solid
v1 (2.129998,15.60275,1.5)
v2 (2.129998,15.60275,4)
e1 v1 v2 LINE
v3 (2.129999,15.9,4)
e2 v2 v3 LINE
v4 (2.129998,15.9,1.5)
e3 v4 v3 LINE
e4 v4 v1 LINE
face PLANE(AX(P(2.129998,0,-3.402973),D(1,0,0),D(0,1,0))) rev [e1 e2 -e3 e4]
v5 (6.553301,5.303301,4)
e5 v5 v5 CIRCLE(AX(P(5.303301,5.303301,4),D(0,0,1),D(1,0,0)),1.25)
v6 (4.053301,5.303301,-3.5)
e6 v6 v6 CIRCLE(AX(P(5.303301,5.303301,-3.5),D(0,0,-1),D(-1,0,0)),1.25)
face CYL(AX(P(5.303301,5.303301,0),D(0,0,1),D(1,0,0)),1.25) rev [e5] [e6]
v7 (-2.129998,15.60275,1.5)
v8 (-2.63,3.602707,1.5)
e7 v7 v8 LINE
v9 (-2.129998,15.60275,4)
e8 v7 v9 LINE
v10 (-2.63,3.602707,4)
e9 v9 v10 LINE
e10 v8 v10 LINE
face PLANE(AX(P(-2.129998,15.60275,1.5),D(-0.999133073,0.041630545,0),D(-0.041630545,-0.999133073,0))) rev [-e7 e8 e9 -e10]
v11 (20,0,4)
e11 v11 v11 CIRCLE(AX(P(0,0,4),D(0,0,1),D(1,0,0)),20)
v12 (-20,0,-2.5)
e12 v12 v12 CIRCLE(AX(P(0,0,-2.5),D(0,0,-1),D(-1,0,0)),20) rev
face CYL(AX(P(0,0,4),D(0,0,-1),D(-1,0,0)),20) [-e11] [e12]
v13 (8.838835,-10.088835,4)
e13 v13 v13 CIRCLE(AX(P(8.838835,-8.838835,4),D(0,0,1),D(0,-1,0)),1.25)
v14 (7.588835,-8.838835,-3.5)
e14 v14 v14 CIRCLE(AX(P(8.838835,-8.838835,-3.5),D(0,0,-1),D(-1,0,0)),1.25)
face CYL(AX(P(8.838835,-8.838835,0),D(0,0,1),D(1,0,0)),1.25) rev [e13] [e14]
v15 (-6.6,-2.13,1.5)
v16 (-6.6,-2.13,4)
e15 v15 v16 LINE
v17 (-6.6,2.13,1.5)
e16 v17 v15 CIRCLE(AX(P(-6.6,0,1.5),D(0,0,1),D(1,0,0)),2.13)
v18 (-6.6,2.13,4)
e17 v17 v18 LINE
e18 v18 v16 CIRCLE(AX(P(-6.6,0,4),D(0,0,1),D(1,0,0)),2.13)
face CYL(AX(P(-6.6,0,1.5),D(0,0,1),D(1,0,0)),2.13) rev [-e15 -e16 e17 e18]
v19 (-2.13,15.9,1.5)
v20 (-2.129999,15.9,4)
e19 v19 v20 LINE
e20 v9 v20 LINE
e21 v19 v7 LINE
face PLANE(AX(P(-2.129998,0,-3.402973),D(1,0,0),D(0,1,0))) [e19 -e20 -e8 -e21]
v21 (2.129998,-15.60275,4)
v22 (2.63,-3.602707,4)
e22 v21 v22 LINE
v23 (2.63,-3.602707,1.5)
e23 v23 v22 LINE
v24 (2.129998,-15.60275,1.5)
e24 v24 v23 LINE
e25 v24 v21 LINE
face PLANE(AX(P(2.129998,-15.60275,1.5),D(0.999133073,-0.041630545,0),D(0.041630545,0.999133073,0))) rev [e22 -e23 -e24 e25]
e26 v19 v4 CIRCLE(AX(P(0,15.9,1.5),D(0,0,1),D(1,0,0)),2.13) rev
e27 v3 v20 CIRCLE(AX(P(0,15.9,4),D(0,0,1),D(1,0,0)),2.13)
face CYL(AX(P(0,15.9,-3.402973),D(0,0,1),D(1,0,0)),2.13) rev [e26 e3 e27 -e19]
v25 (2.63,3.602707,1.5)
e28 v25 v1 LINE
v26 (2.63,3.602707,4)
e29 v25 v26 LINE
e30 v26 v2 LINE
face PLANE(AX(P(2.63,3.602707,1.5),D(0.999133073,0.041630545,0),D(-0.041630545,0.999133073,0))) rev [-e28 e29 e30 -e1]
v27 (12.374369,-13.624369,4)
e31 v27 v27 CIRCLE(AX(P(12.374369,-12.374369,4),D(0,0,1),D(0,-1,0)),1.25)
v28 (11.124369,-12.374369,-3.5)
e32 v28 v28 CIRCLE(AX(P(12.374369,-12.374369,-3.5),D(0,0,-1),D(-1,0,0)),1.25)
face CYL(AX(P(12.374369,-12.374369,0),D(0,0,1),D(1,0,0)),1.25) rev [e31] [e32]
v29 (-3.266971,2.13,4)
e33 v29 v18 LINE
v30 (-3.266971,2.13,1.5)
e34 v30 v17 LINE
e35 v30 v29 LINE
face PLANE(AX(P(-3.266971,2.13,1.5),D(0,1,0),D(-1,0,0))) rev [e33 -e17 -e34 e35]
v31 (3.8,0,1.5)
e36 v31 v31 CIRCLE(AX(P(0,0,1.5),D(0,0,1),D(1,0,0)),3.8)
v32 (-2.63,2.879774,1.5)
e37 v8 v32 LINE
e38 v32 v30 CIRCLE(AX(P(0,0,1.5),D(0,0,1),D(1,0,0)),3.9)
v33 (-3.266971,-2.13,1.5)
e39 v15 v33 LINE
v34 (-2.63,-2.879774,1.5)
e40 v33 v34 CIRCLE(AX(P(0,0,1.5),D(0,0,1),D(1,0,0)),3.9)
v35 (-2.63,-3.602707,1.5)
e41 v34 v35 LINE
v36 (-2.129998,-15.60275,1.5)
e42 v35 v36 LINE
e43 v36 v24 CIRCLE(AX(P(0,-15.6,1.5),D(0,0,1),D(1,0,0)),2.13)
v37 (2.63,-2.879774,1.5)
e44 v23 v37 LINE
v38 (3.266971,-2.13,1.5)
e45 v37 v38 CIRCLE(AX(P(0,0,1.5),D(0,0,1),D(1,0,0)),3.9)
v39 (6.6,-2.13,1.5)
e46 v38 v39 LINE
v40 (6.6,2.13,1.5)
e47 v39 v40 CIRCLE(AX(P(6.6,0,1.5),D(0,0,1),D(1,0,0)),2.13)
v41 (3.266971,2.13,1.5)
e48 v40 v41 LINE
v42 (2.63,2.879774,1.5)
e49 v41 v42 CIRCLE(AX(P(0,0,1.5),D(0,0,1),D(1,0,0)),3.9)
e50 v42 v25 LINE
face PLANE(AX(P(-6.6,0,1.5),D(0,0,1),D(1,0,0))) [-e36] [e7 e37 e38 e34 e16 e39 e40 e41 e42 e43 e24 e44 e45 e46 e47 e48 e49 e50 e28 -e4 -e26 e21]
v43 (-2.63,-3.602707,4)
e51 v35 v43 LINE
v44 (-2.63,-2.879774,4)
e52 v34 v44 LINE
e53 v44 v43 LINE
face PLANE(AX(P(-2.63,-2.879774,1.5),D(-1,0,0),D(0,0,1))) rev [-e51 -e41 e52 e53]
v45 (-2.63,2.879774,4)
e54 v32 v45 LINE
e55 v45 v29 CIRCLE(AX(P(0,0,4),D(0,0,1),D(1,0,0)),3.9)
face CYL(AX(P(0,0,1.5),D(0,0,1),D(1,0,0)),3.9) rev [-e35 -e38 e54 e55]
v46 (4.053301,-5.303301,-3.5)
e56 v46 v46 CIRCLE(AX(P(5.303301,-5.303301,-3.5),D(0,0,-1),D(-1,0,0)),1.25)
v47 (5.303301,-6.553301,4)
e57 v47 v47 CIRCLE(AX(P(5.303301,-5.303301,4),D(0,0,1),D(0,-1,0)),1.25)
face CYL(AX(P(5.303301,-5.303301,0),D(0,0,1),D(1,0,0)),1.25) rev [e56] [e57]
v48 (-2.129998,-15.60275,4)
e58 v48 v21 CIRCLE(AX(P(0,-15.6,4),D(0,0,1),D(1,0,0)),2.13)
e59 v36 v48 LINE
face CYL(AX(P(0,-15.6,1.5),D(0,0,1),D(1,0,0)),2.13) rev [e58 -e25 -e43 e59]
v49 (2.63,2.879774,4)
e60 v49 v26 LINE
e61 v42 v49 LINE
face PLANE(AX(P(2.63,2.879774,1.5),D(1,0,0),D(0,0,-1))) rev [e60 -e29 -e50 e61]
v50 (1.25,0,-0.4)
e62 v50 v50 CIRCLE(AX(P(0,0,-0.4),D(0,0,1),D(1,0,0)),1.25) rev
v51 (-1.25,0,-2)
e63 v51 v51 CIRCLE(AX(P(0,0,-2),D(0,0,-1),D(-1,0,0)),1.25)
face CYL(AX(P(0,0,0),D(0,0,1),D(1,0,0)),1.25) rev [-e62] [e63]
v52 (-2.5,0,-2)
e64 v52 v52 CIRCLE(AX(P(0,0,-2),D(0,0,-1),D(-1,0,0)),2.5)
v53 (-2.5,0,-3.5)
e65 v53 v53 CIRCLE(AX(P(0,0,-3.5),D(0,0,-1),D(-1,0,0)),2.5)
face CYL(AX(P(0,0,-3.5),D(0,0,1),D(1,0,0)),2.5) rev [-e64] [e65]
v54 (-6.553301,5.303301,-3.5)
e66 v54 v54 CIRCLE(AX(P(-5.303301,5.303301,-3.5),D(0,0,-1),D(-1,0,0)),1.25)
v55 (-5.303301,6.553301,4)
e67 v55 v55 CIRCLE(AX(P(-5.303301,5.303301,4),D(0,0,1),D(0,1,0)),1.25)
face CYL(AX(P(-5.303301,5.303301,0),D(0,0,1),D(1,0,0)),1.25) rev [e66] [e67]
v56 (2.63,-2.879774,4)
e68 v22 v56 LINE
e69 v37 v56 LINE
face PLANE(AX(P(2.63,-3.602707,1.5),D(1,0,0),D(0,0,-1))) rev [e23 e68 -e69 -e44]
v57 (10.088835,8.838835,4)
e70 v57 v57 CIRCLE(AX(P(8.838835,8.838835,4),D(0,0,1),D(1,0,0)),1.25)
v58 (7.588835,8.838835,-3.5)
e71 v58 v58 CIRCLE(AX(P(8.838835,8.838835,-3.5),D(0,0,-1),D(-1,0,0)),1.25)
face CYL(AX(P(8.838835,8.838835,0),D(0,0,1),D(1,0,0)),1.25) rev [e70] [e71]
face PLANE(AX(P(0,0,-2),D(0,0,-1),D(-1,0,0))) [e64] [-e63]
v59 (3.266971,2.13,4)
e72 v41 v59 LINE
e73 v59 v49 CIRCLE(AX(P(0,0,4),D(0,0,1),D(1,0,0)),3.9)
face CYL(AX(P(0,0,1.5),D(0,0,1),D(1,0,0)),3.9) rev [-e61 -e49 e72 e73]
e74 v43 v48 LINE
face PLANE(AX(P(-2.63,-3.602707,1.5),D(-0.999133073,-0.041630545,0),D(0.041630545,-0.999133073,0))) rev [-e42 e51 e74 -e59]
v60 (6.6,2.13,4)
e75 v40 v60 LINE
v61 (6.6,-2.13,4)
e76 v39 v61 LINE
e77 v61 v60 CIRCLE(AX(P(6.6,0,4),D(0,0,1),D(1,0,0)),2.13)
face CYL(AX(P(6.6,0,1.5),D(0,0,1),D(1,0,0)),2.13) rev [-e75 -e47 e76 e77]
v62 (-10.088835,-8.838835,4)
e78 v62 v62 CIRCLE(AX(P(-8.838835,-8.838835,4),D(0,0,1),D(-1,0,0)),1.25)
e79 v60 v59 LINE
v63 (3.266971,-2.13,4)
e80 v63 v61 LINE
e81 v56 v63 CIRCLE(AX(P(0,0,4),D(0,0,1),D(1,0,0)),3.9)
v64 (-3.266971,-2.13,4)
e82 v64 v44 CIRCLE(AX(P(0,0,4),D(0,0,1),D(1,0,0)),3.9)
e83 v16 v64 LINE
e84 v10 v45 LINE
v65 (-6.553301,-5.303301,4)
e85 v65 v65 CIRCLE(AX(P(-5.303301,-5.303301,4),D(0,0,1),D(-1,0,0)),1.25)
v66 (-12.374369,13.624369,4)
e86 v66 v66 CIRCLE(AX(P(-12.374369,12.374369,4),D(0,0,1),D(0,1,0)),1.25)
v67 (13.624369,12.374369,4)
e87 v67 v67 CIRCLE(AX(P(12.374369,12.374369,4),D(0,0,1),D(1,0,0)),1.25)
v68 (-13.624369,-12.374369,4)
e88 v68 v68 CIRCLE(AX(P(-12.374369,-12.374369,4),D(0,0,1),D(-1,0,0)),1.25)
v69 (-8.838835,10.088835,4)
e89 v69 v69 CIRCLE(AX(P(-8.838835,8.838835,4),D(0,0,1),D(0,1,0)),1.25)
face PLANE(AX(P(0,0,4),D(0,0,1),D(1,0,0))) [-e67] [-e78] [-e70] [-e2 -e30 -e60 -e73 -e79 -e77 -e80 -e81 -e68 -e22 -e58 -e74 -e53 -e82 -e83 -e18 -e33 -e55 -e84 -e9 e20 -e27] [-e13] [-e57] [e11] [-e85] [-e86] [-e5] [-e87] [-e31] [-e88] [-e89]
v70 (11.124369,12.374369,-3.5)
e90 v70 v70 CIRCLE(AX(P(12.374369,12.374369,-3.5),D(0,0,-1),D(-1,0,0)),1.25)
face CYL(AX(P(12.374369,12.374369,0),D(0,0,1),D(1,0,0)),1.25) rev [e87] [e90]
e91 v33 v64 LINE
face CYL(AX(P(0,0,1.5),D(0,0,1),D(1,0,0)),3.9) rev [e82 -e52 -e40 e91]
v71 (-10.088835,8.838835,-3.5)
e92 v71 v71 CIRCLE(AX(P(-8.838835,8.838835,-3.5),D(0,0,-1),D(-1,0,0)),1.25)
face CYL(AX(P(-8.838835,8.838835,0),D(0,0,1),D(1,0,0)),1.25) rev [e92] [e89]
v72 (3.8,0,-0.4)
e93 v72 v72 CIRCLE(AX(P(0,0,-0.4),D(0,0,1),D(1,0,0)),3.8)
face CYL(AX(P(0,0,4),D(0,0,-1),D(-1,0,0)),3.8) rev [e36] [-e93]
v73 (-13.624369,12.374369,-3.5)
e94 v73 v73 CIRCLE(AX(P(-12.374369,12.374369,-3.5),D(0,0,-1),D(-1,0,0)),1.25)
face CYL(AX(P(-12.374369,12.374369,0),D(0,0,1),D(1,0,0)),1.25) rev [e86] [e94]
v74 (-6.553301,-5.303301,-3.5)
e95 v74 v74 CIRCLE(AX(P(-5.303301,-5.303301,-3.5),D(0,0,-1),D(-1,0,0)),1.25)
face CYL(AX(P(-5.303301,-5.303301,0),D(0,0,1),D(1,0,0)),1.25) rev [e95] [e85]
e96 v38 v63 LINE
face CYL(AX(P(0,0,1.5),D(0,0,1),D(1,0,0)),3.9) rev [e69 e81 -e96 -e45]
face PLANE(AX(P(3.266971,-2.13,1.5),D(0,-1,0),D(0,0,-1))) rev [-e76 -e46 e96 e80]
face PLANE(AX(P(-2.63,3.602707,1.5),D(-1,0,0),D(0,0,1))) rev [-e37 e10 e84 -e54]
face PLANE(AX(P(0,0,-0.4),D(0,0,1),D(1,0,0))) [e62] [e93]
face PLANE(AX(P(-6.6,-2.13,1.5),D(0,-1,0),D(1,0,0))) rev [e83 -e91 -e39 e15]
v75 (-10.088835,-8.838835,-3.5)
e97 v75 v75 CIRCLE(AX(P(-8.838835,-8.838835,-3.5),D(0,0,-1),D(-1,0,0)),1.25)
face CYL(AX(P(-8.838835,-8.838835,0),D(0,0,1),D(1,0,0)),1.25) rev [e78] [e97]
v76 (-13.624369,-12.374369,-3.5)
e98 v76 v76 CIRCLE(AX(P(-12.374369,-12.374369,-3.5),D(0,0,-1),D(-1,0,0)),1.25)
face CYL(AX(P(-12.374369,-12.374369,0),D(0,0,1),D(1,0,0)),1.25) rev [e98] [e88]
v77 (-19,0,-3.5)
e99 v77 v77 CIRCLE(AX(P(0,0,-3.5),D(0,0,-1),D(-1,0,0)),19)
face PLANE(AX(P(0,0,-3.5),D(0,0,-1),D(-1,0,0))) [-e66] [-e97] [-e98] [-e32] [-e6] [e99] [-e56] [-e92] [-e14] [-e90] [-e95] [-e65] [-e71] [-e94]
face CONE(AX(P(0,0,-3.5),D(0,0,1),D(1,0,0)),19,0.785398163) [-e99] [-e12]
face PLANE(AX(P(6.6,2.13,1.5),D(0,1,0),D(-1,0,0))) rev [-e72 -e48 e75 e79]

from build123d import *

# Parameters (mm, degrees)
SKETCH1_R               = 20
BOSS_EXTRUDE1_DEPTH     = 4
SKETCH2_R               = 1.25
CUT_EXTRUDE1_DEPTH      = 29.565713714
CAVITY1_START           = 2.8
CAVITY1_OUTLINE_R       = 0.675
CAVITY1_OUTLINE_R_2     = 0.6
CAVITY1_OUTLINE_R_3     = 2.5
CAVITY1_DEPTH           = 1.2
CAVITY1_START_2         = 3.4
CAVITY1_2_OUTLINE_R     = 2.5
CAVITY1_2_OUTLINE_R_2   = 1.25
CAVITY1_2_DEPTH         = 0.6
CUT_EXTRUDE2_START      = -2
CUT_EXTRUDE2_DEPTH      = 2
CUT_EXTRUDE3_START      = -1.2
CUT_EXTRUDE3_DEPTH      = 1.2
CUT_EXTRUDE4_DEPTH      = 1.2
SKETCH6_R               = 1.25
CUT_EXTRUDE5_DEPTH      = 29.565713714
CIRPATTERN1_COUNT       = 4
CUT_EXTRUDE6_DEPTH      = 29.422526278
CUT_EXTRUDE6_DEPTH_BACK = 2.4
SKETCH7_R               = 3.8
SKETCH8_R               = 20
SKETCH8_R_2             = 2.5
SKETCH8_R_3             = 1.25
BOSS_EXTRUDE2_DEPTH     = 3.5
CUT_EXTRUDE7_DEPTH      = 2.5
SKETCH10_R              = 2.5
SKETCH10_R_2            = 1.25
BOSS_EXTRUDE4_DEPTH     = 0.8
SKETCH11_R              = 2.5
SKETCH11_R_2            = 1.25
BOSS_EXTRUDE5_DEPTH     = 1.2
SKETCH12_R              = 3.8
CUT_EXTRUDE8_DEPTH      = 0.8
CHAMFER1_SIZE           = 1
CUT_EXTRUDE9_START      = -2.5
CUT_EXTRUDE9_DEPTH      = 2.5


# Read off the part's stored shape, not the designer's step: Cavity1, Cut-Extrude9
with BuildPart() as part:
    # Sketch1 → Boss-Extrude1 (new body)
    with BuildSketch(Plane.XY):
        Circle(SKETCH1_R)
    extrude(amount=BOSS_EXTRUDE1_DEPTH)

    # Sketch2 → Cut-Extrude1 (cut, through all)
    with BuildSketch(Plane.XY.offset(4)):
        Circle(SKETCH2_R)
    extrude(amount=-CUT_EXTRUDE1_DEPTH, mode=Mode.SUBTRACT)

    # Cavity1 outline → Cavity1 (cut)
    with BuildSketch(Plane.XY.offset(CAVITY1_START)):
        with BuildLine():
            ThreePointArc((2.993325909, 2), (2.762479071, 2.308399745), (2.5, 2.590366769))
            Line((2.5, 2.590366769), (2.5, 3.6))
            Line((2.5, 3.6), (2, 15.6))
            ThreePointArc((2, 15.6), (0, 17.6), (-2, 15.6))
            Line((-2, 15.6), (-2.5, 3.6))
            Line((-2.5, 3.6), (-2.5, 2.590366769))
            ThreePointArc((-2.5, 2.590366769), (-2.762479071, 2.308399745), (-2.993325909, 2))
            Line((-2.993325909, 2), (-6.6, 2))
            ThreePointArc((-6.6, 2), (-8.6, 0), (-6.6, -2))
            Line((-6.6, -2), (-2.993325909, -2))
            ThreePointArc((-2.993325909, -2), (-2.762479071, -2.308399745), (-2.5, -2.590366769))
            Line((-2.5, -2.590366769), (-2.5, -3.6))
            Line((-2.5, -3.6), (-2, -15.6))
            ThreePointArc((-2, -15.6), (0, -17.6), (2, -15.6))
            Line((2, -15.6), (2.5, -3.6))
            Line((2.5, -3.6), (2.5, -2.590366769))
            ThreePointArc((2.5, -2.590366769), (2.762479071, -2.308399745), (2.993325909, -2))
            Line((2.993325909, -2), (6.6, -2))
            ThreePointArc((6.6, -2), (8.6, 0), (6.6, 2))
            Line((6.6, 2), (2.993325909, 2))
        make_face()
        with Locations((0, -15.6)):
            Circle(CAVITY1_OUTLINE_R, mode=Mode.SUBTRACT)
        with Locations((0, -13.4)):
            Circle(CAVITY1_OUTLINE_R, mode=Mode.SUBTRACT)
        with Locations((0, -11.2)):
            Circle(CAVITY1_OUTLINE_R, mode=Mode.SUBTRACT)
        with Locations((0, -9)):
            Circle(CAVITY1_OUTLINE_R, mode=Mode.SUBTRACT)
        with Locations((0, -6.8)):
            Circle(CAVITY1_OUTLINE_R, mode=Mode.SUBTRACT)
        with Locations((0, -4.6)):
            Circle(CAVITY1_OUTLINE_R, mode=Mode.SUBTRACT)
        with Locations((-6.6, 0)):
            Circle(CAVITY1_OUTLINE_R_2, mode=Mode.SUBTRACT)
        with Locations((-4.6, 0)):
            Circle(CAVITY1_OUTLINE_R_2, mode=Mode.SUBTRACT)
        Circle(CAVITY1_OUTLINE_R_3, mode=Mode.SUBTRACT)
        with Locations((0, 4.6)):
            Circle(CAVITY1_OUTLINE_R, mode=Mode.SUBTRACT)
        with Locations((0, 6.8)):
            Circle(CAVITY1_OUTLINE_R, mode=Mode.SUBTRACT)
        with Locations((4.6, 0)):
            Circle(CAVITY1_OUTLINE_R_2, mode=Mode.SUBTRACT)
        with Locations((6.6, 0)):
            Circle(CAVITY1_OUTLINE_R_2, mode=Mode.SUBTRACT)
        with Locations((0, 9)):
            Circle(CAVITY1_OUTLINE_R, mode=Mode.SUBTRACT)
        with Locations((0, 11.2)):
            Circle(CAVITY1_OUTLINE_R, mode=Mode.SUBTRACT)
        with Locations((0, 13.4)):
            Circle(CAVITY1_OUTLINE_R, mode=Mode.SUBTRACT)
        with Locations((0, 15.6)):
            Circle(CAVITY1_OUTLINE_R, mode=Mode.SUBTRACT)
    extrude(amount=CAVITY1_DEPTH, mode=Mode.SUBTRACT)

    # Cavity1 2 outline → Cavity1 2 (cut)
    with BuildSketch(Plane.XY.offset(CAVITY1_START_2)):
        Circle(CAVITY1_2_OUTLINE_R)
        Circle(CAVITY1_2_OUTLINE_R_2, mode=Mode.SUBTRACT)
    extrude(amount=CAVITY1_2_DEPTH, mode=Mode.SUBTRACT)

    # Sketch3 → Cut-Extrude2 (cut)
    with BuildSketch(Plane.XY.offset(3.4).offset(CUT_EXTRUDE2_START)):
        with BuildLine():
            ThreePointArc((-2.5, 0), (0, -2.5), (2.5, 0))
            ThreePointArc((2.5, 0), (0, 2.5), (-2.5, 0))
        make_face()
    extrude(amount=CUT_EXTRUDE2_DEPTH, mode=Mode.SUBTRACT)

    # Sketch4 → Cut-Extrude3 (cut)
    with BuildSketch(Plane.XY.offset(4).offset(CUT_EXTRUDE3_START)):
        with BuildLine():
            Line((-6.6, -2), (-2.993325909, -2))
            ThreePointArc((-2.993325909, -2), (-2.762479071, -2.308399745), (-2.5, -2.590366769))
            Line((-2.5, -2.590366769), (-2.5, -3.6))
            Line((-2.5, -3.6), (-2, -15.6))
            ThreePointArc((-2, -15.6), (0, -17.6), (2, -15.6))
            Line((2, -15.6), (2.5, -3.6))
            Line((2.5, -3.6), (2.5, -2.590366769))
            ThreePointArc((2.5, -2.590366769), (2.762479071, -2.308399745), (2.993325909, -2))
            Line((2.993325909, -2), (6.6, -2))
            ThreePointArc((6.6, -2), (8.6, 0), (6.6, 2))
            Line((6.6, 2), (2.993325909, 2))
            ThreePointArc((2.993325909, 2), (2.762479071, 2.308399745), (2.5, 2.590366769))
            Line((2.5, 2.590366769), (2.5, 3.6))
            Line((2.5, 3.6), (2, 15.6))
            ThreePointArc((2, 15.6), (0, 17.6), (-2, 15.6))
            Line((-2, 15.6), (-2.5, 3.6))
            Line((-2.5, 3.6), (-2.5, 2.590366769))
            ThreePointArc((-2.5, 2.590366769), (-2.762479071, 2.308399745), (-2.993325909, 2))
            Line((-2.993325909, 2), (-6.6, 2))
            ThreePointArc((-6.6, 2), (-8.6, 0), (-6.6, -2))
        make_face()
    extrude(amount=CUT_EXTRUDE3_DEPTH, mode=Mode.SUBTRACT)

    # Sketch5 → Cut-Extrude4 (cut)
    with BuildSketch(Plane.XY.offset(4)):
        with BuildLine():
            Line((-6.6, -2.03), (-3.00931886, -2.03))
            ThreePointArc((-3.00931886, -2.03), (-2.784441978, -2.328901645), (-2.53, -2.603075105))
            Line((-2.53, -2.603075105), (-2.53, -3.600624729))
            Line((-2.53, -3.600624729), (-2.029999903, -15.600627053))
            ThreePointArc((-2.029999903, -15.600627053), (0, -17.63), (2.029999903, -15.600627053))
            Line((2.029999903, -15.600627053), (2.53, -3.600624729))
            Line((2.53, -3.600624729), (2.53, -2.603075105))
            ThreePointArc((2.53, -2.603075105), (2.784441978, -2.328901645), (3.00931886, -2.03))
            Line((3.00931886, -2.03), (6.6, -2.03))
            ThreePointArc((6.6, -2.03), (8.63, 0), (6.6, 2.03))
            Line((6.6, 2.03), (3.00931886, 2.03))
            ThreePointArc((3.00931886, 2.03), (2.784441978, 2.328901645), (2.53, 2.603075105))
            Line((2.53, 2.603075105), (2.53, 3.600624729))
            Line((2.53, 3.600624729), (2.029999903, 15.600627053))
            ThreePointArc((2.029999903, 15.600627053), (0, 17.63), (-2.029999903, 15.600627053))
            Line((-2.029999903, 15.600627053), (-2.53, 3.600624729))
            Line((-2.53, 3.600624729), (-2.53, 2.603075105))
            ThreePointArc((-2.53, 2.603075105), (-2.784441978, 2.328901645), (-3.00931886, 2.03))
            Line((-3.00931886, 2.03), (-6.6, 2.03))
            ThreePointArc((-6.6, 2.03), (-8.63, 0), (-6.6, -2.03))
        make_face()
    extrude(amount=-CUT_EXTRUDE4_DEPTH, mode=Mode.SUBTRACT)

    # Sketch6 → Cut-Extrude5 (cut, through all)
    with BuildSketch(Plane.XY.offset(4)):
        with Locations((5.303300859, 5.303300859)):
            Circle(SKETCH6_R)
        with Locations((8.838834765, 8.838834765)):
            Circle(SKETCH6_R)
        with Locations((12.374368671, 12.374368671)):
            Circle(SKETCH6_R)
    cut_extrude5 = extrude(amount=-CUT_EXTRUDE5_DEPTH, mode=Mode.SUBTRACT)

    # CirPattern1: Cut-Extrude5 ×4 about axis
    cirpattern1_axis = Axis((0, 0, 0), (0, 0, 1))
    for i in range(1, CIRPATTERN1_COUNT):
        add(cut_extrude5.rotate(cirpattern1_axis, i * 360 / CIRPATTERN1_COUNT), mode=Mode.SUBTRACT)

    # Sketch7 → Cut-Extrude6 (cut, two sides: drawn at the far end of the back side and taken through both)
    with BuildSketch(Plane.XY.offset(2.8).offset(-CUT_EXTRUDE6_DEPTH_BACK)):
        with Locations(Location((0, 0, 0), (0, 0, 147.709612918))):
            Circle(SKETCH7_R)
    extrude(amount=CUT_EXTRUDE6_DEPTH + CUT_EXTRUDE6_DEPTH_BACK, mode=Mode.SUBTRACT)

    # Sketch8 → Boss-Extrude2 (add)
    with BuildSketch(Plane(origin=(0, 0, 0), x_dir=(-1, 0, 0), z_dir=(0, 0, -1))):
        Circle(SKETCH8_R)
        Circle(SKETCH8_R_2, mode=Mode.SUBTRACT)
        with Locations(Location((12.374368671, 12.374368671, 0), (0, 0, 90))):
            Circle(SKETCH8_R_3, mode=Mode.SUBTRACT)
        with Locations(Location((-12.374368671, 12.374368671, 0), (0, 0, 180))):
            Circle(SKETCH8_R_3, mode=Mode.SUBTRACT)
        with Locations(Location((-8.838834765, 8.838834765, 0), (0, 0, 180))):
            Circle(SKETCH8_R_3, mode=Mode.SUBTRACT)
        with Locations(Location((-5.303300859, 5.303300859, 0), (0, 0, 180))):
            Circle(SKETCH8_R_3, mode=Mode.SUBTRACT)
        with Locations((12.374368671, -12.374368671)):
            Circle(SKETCH8_R_3, mode=Mode.SUBTRACT)
        with Locations((8.838834765, -8.838834765)):
            Circle(SKETCH8_R_3, mode=Mode.SUBTRACT)
        with Locations((5.303300859, -5.303300859)):
            Circle(SKETCH8_R_3, mode=Mode.SUBTRACT)
        with Locations(Location((-12.374368671, -12.374368671, 0), (0, 0, 270))):
            Circle(SKETCH8_R_3, mode=Mode.SUBTRACT)
        with Locations(Location((-8.838834765, -8.838834765, 0), (0, 0, 270))):
            Circle(SKETCH8_R_3, mode=Mode.SUBTRACT)
        with Locations(Location((-5.303300859, -5.303300859, 0), (0, 0, 270))):
            Circle(SKETCH8_R_3, mode=Mode.SUBTRACT)
        with Locations(Location((5.303300859, 5.303300859, 0), (0, 0, 90))):
            Circle(SKETCH8_R_3, mode=Mode.SUBTRACT)
        with Locations(Location((8.838834765, 8.838834765, 0), (0, 0, 90))):
            Circle(SKETCH8_R_3, mode=Mode.SUBTRACT)
    extrude(amount=BOSS_EXTRUDE2_DEPTH)

    # Sketch9 → Cut-Extrude7 (cut)
    with BuildSketch(Plane.XY.offset(4)):
        with BuildLine():
            Line((2.63, 3.602707159), (2.129998225, 15.602749757))
            ThreePointArc((2.129998225, 15.602749757), (0, 17.73), (-2.129998225, 15.602749757))
            Line((-2.129998225, 15.602749757), (-2.63, 3.602707159))
            Line((-2.63, 3.602707159), (-2.63, 2.879774297))
            ThreePointArc((-2.63, 2.879774297), (-2.972222626, 2.525053002), (-3.266971074, 2.13))
            Line((-3.266971074, 2.13), (-6.6, 2.13))
            ThreePointArc((-6.6, 2.13), (-8.73, 0), (-6.6, -2.13))
            Line((-6.6, -2.13), (-3.266971074, -2.13))
            ThreePointArc((-3.266971074, -2.13), (-2.972222626, -2.525053002), (-2.63, -2.879774297))
            Line((-2.63, -2.879774297), (-2.63, -3.602707159))
            Line((-2.63, -3.602707159), (-2.129998225, -15.602749757))
            ThreePointArc((-2.129998225, -15.602749757), (0, -17.73), (2.129998225, -15.602749757))
            Line((2.129998225, -15.602749757), (2.63, -3.602707159))
            Line((2.63, -3.602707159), (2.63, -2.879774297))
            ThreePointArc((2.63, -2.879774297), (2.972222626, -2.525053002), (3.266971074, -2.13))
            Line((3.266971074, -2.13), (6.6, -2.13))
            ThreePointArc((6.6, -2.13), (8.73, 0), (6.6, 2.13))
            Line((6.6, 2.13), (3.266971074, 2.13))
            ThreePointArc((3.266971074, 2.13), (2.972222626, 2.525053002), (2.63, 2.879774297))
            Line((2.63, 2.879774297), (2.63, 3.602707159))
        make_face()
    extrude(amount=-CUT_EXTRUDE7_DEPTH, mode=Mode.SUBTRACT)

    # Sketch10 → Boss-Extrude4 (add)
    with BuildSketch(Plane(origin=(0, 0, 0), x_dir=(-1, 0, 0), z_dir=(0, 0, -1))):
        Circle(SKETCH10_R)
        with Locations(Location((0, 0, 0), (0, 0, 180))):
            Circle(SKETCH10_R_2, mode=Mode.SUBTRACT)
    extrude(amount=BOSS_EXTRUDE4_DEPTH)

    # Sketch11 → Boss-Extrude5 (add)
    with BuildSketch(Plane(origin=(0, 0, -0.8), x_dir=(-1, 0, 0), z_dir=(0, 0, -1))):
        Circle(SKETCH11_R)
        with Locations(Location((0, 0, 0), (0, 0, 180))):
            Circle(SKETCH11_R_2, mode=Mode.SUBTRACT)
    extrude(amount=BOSS_EXTRUDE5_DEPTH)

    # Sketch12 → Cut-Extrude8 (cut)
    with BuildSketch(Plane.XY.offset(0.4)):
        Circle(SKETCH12_R)
    extrude(amount=-CUT_EXTRUDE8_DEPTH, mode=Mode.SUBTRACT)

    # Chamfer1
    chamfer1_edges = [part.edges().sort_by_distance(p)[0] for p in [
        (20, 0, -3.5),
    ]]
    chamfer(chamfer1_edges, length=CHAMFER1_SIZE)

    # Cut-Extrude9 outline → Cut-Extrude9 (cut)
    with BuildSketch(Plane.XY.offset(4).offset(CUT_EXTRUDE9_START)):
        with BuildLine():
            Line((-2.13, 15.9), (-2.129998225, 15.602749757))
            ThreePointArc((-2.129998225, 15.602749757), (0, 17.73), (2.129998225, 15.602749757))
            Line((2.129998225, 15.602749757), (2.13, 15.9))
            ThreePointArc((2.13, 15.9), (0, 18.03), (-2.13, 15.9))
        make_face()
    extrude(amount=CUT_EXTRUDE9_DEPTH, mode=Mode.SUBTRACT)


solid = part.part
